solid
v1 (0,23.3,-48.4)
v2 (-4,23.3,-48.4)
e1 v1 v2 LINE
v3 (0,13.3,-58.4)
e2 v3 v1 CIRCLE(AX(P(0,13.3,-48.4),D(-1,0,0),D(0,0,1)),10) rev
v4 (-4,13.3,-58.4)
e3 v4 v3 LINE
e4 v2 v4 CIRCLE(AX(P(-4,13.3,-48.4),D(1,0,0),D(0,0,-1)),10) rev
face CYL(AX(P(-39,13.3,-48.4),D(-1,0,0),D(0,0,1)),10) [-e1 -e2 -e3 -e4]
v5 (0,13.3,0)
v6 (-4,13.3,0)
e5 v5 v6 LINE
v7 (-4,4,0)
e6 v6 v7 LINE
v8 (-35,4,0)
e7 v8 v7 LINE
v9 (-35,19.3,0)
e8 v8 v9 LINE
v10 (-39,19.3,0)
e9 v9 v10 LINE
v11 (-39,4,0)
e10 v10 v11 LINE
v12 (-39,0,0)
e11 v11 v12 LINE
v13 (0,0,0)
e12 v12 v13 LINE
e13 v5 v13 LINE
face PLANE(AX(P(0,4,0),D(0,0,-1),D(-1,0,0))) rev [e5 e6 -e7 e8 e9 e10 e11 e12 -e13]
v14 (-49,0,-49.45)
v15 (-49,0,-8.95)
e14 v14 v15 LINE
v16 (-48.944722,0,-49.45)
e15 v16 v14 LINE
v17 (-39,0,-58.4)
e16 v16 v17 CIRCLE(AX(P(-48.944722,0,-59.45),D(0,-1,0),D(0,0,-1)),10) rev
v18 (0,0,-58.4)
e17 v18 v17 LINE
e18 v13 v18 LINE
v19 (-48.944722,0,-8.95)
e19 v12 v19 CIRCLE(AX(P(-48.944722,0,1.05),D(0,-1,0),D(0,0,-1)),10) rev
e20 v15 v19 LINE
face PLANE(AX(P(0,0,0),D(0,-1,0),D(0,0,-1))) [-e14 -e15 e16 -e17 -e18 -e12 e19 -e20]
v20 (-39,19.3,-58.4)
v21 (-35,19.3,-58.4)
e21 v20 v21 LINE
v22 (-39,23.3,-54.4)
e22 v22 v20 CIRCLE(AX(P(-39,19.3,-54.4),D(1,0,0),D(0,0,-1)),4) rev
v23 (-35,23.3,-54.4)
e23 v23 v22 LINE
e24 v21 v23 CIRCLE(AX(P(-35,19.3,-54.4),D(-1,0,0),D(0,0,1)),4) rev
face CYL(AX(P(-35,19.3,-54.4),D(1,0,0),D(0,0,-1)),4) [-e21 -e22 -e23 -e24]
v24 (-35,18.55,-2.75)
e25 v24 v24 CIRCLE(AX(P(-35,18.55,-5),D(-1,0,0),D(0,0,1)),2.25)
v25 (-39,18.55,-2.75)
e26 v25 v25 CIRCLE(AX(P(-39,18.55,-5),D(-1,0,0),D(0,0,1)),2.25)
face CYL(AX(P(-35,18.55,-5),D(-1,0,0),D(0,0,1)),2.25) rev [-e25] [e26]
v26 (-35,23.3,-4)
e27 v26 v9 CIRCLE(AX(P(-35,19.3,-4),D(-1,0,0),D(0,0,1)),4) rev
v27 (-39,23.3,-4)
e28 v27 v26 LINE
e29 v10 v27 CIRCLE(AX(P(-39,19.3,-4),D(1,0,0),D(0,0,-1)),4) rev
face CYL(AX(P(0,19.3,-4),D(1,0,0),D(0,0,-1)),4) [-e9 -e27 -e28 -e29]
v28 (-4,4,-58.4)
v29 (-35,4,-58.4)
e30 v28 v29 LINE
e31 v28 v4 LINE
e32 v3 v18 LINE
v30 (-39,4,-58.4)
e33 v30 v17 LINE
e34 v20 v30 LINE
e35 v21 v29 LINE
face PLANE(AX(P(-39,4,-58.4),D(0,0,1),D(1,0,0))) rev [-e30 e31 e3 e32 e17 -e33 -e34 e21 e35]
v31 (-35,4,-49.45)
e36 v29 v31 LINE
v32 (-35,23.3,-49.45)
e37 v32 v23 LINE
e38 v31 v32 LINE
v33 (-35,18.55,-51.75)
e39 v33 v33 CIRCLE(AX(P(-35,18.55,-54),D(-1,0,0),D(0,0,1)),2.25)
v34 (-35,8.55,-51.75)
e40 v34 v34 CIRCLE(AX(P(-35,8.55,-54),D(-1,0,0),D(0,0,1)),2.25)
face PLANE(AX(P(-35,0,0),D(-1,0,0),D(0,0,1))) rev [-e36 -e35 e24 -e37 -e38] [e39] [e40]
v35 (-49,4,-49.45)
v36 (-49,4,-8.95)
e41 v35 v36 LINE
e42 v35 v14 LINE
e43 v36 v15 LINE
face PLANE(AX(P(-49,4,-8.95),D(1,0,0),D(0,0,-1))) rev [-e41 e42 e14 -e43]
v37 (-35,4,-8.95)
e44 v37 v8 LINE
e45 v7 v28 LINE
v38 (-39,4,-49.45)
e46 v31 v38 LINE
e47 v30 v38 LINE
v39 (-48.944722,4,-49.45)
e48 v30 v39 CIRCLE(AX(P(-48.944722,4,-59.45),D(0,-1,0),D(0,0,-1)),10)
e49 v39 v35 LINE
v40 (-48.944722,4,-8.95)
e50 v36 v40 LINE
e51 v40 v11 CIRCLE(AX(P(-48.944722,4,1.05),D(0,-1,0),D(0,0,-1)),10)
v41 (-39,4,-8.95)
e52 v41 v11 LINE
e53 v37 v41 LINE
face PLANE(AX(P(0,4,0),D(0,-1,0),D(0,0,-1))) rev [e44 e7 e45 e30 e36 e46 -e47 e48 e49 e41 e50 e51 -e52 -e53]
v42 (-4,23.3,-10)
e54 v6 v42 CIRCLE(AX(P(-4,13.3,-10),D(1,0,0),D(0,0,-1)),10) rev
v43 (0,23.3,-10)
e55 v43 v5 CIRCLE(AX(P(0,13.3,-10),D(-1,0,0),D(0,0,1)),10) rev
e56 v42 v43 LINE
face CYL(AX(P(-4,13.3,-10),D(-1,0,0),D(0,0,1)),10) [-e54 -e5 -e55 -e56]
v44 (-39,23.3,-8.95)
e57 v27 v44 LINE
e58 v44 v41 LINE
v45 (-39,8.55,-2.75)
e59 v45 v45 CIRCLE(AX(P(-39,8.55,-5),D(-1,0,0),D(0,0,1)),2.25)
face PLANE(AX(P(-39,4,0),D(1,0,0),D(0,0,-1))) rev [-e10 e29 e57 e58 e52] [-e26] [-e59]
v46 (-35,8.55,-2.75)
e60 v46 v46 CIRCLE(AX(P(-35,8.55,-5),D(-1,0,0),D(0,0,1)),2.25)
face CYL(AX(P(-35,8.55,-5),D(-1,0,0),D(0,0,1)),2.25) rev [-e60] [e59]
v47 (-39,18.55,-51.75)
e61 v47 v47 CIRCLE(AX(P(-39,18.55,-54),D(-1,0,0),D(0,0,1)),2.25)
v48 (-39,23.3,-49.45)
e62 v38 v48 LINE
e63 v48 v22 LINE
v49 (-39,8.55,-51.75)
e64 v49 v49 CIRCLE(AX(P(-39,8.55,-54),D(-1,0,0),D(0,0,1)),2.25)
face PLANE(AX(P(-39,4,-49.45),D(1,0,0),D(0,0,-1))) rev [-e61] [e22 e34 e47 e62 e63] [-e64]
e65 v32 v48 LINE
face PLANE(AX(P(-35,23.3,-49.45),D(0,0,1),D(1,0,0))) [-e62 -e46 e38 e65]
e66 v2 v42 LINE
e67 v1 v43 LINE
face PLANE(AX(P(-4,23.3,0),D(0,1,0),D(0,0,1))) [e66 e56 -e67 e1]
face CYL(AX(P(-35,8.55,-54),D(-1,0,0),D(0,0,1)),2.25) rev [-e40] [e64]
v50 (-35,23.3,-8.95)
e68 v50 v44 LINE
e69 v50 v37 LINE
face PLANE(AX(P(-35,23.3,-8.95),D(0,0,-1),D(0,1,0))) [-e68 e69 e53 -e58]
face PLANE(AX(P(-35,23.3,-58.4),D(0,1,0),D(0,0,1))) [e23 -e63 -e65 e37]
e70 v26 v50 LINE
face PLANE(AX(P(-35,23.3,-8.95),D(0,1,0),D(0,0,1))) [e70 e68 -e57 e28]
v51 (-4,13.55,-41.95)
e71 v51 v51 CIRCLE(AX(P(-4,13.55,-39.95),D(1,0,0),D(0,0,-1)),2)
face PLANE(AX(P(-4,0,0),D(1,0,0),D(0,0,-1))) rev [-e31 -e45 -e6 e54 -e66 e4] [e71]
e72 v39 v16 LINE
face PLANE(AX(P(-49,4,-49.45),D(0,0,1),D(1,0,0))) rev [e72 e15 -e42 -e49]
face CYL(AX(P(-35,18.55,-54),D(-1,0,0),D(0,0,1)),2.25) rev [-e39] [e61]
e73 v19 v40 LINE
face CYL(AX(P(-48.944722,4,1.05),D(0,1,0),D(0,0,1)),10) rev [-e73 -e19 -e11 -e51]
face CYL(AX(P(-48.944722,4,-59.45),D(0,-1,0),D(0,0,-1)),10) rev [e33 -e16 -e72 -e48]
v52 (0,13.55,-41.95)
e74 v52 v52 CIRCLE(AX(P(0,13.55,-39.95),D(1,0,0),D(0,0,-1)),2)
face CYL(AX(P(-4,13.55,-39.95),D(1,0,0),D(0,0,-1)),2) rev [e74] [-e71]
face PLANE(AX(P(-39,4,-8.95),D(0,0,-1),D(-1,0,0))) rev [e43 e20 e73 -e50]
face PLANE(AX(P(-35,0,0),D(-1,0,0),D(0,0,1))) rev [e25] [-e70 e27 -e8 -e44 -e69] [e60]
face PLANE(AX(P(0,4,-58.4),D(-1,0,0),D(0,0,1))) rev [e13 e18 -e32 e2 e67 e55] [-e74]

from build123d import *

# Parameters (mm, degrees)
BOSS_EXTRUDE1_DEPTH = 4
SKETCH2_W           = 8.95
SKETCH2_H           = 19.3
SKETCH2_R           = 2.25
BOSS_EXTRUDE2_DEPTH = 4
FILLET1_R           = 10
FILLET2_R           = 4
SKETCH3_W           = 58.4
SKETCH3_H           = 19.3
SKETCH3_R           = 2
BOSS_EXTRUDE3_DEPTH = 4
FILLET3_R           = 10


with BuildPart() as part:
    # Sketch1 → Boss-Extrude1 (new body)
    with BuildSketch(Plane(origin=(0, 0, 0), x_dir=(1, 0, 0), z_dir=(0, 1, 0))):
        Polygon((-49, 49.45), (-39, 49.45), (-39, 58.4), (0, 58.4), (0, 0), (-39, 0), (-39, 8.95), (-49, 8.95), align=None)
    extrude(amount=BOSS_EXTRUDE1_DEPTH)

    # Sketch2 → Boss-Extrude2 (add)
    # profile 1 of 2: a face of its own
    with BuildSketch(Plane.ZY.offset(39)):
        with Locations((-4.475, 13.65)):
            Rectangle(SKETCH2_W, SKETCH2_H)
        with Locations((-5, 18.55)):
            Circle(SKETCH2_R, mode=Mode.SUBTRACT)
        with Locations((-5, 8.55)):
            Circle(SKETCH2_R, mode=Mode.SUBTRACT)
    # profile 2 of 2: a face of its own
    with BuildSketch(Plane.ZY.offset(39)):
        with Locations((-53.925, 13.65)):
            Rectangle(SKETCH2_W, SKETCH2_H)
        with Locations((-54, 18.55)):
            Circle(SKETCH2_R, mode=Mode.SUBTRACT)
        with Locations((-54, 8.55)):
            Circle(SKETCH2_R, mode=Mode.SUBTRACT)
    extrude(amount=-BOSS_EXTRUDE2_DEPTH)

    # Fillet1
    # the kernel refuses this fillet: 10 mm, written as the material it adds along each edge
    with BuildSketch(Plane(origin=(-39, 0, -49.45), x_dir=(-1, 0, 0), z_dir=(0, 1, 0))) as fillet1_piece_1:
        with BuildLine():
            CenterArc((9.944722218, -10), FILLET1_R, 90, 83.97283344)
            Line((0, -8.95), (0, 0))
            Line((0, 0), (9.944722218, 0))
        make_face()
    extrude(amount=4)
    with BuildSketch(Plane(origin=(-39, 0, -8.95), x_dir=(0, 0, 1), z_dir=(0, 1, 0))) as fillet1_piece_2:
        with BuildLine():
            CenterArc((10, -9.944722218), FILLET1_R, 96.02716656, 83.97283344)
            Line((0, -9.944722218), (0, 0))
            Line((0, 0), (8.95, 0))
        make_face()
    extrude(amount=4)

    # Fillet2
    fillet2_edges = [part.edges().sort_by_distance(p)[0] for p in [
        (-37, 23.3, 0),
        (-37, 23.3, -58.4),
    ]]
    fillet(fillet2_edges, radius=FILLET2_R)

    # Sketch3 → Boss-Extrude3 (add)
    with BuildSketch(Plane(origin=(0, 0, 0), x_dir=(0, 0, -1), z_dir=(1, 0, 0))):
        with Locations((29.2, 13.65)):
            Rectangle(SKETCH3_W, SKETCH3_H)
        with Locations((39.95, 13.55)):
            Circle(SKETCH3_R, mode=Mode.SUBTRACT)
    extrude(amount=-BOSS_EXTRUDE3_DEPTH)

    # Fillet3
    fillet3_edges = [part.edges().sort_by_distance(p)[0] for p in [
        (-2, 23.3, 0),
        (-2, 23.3, -58.4),
    ]]
    fillet(fillet3_edges, radius=FILLET3_R)


solid = part.part
